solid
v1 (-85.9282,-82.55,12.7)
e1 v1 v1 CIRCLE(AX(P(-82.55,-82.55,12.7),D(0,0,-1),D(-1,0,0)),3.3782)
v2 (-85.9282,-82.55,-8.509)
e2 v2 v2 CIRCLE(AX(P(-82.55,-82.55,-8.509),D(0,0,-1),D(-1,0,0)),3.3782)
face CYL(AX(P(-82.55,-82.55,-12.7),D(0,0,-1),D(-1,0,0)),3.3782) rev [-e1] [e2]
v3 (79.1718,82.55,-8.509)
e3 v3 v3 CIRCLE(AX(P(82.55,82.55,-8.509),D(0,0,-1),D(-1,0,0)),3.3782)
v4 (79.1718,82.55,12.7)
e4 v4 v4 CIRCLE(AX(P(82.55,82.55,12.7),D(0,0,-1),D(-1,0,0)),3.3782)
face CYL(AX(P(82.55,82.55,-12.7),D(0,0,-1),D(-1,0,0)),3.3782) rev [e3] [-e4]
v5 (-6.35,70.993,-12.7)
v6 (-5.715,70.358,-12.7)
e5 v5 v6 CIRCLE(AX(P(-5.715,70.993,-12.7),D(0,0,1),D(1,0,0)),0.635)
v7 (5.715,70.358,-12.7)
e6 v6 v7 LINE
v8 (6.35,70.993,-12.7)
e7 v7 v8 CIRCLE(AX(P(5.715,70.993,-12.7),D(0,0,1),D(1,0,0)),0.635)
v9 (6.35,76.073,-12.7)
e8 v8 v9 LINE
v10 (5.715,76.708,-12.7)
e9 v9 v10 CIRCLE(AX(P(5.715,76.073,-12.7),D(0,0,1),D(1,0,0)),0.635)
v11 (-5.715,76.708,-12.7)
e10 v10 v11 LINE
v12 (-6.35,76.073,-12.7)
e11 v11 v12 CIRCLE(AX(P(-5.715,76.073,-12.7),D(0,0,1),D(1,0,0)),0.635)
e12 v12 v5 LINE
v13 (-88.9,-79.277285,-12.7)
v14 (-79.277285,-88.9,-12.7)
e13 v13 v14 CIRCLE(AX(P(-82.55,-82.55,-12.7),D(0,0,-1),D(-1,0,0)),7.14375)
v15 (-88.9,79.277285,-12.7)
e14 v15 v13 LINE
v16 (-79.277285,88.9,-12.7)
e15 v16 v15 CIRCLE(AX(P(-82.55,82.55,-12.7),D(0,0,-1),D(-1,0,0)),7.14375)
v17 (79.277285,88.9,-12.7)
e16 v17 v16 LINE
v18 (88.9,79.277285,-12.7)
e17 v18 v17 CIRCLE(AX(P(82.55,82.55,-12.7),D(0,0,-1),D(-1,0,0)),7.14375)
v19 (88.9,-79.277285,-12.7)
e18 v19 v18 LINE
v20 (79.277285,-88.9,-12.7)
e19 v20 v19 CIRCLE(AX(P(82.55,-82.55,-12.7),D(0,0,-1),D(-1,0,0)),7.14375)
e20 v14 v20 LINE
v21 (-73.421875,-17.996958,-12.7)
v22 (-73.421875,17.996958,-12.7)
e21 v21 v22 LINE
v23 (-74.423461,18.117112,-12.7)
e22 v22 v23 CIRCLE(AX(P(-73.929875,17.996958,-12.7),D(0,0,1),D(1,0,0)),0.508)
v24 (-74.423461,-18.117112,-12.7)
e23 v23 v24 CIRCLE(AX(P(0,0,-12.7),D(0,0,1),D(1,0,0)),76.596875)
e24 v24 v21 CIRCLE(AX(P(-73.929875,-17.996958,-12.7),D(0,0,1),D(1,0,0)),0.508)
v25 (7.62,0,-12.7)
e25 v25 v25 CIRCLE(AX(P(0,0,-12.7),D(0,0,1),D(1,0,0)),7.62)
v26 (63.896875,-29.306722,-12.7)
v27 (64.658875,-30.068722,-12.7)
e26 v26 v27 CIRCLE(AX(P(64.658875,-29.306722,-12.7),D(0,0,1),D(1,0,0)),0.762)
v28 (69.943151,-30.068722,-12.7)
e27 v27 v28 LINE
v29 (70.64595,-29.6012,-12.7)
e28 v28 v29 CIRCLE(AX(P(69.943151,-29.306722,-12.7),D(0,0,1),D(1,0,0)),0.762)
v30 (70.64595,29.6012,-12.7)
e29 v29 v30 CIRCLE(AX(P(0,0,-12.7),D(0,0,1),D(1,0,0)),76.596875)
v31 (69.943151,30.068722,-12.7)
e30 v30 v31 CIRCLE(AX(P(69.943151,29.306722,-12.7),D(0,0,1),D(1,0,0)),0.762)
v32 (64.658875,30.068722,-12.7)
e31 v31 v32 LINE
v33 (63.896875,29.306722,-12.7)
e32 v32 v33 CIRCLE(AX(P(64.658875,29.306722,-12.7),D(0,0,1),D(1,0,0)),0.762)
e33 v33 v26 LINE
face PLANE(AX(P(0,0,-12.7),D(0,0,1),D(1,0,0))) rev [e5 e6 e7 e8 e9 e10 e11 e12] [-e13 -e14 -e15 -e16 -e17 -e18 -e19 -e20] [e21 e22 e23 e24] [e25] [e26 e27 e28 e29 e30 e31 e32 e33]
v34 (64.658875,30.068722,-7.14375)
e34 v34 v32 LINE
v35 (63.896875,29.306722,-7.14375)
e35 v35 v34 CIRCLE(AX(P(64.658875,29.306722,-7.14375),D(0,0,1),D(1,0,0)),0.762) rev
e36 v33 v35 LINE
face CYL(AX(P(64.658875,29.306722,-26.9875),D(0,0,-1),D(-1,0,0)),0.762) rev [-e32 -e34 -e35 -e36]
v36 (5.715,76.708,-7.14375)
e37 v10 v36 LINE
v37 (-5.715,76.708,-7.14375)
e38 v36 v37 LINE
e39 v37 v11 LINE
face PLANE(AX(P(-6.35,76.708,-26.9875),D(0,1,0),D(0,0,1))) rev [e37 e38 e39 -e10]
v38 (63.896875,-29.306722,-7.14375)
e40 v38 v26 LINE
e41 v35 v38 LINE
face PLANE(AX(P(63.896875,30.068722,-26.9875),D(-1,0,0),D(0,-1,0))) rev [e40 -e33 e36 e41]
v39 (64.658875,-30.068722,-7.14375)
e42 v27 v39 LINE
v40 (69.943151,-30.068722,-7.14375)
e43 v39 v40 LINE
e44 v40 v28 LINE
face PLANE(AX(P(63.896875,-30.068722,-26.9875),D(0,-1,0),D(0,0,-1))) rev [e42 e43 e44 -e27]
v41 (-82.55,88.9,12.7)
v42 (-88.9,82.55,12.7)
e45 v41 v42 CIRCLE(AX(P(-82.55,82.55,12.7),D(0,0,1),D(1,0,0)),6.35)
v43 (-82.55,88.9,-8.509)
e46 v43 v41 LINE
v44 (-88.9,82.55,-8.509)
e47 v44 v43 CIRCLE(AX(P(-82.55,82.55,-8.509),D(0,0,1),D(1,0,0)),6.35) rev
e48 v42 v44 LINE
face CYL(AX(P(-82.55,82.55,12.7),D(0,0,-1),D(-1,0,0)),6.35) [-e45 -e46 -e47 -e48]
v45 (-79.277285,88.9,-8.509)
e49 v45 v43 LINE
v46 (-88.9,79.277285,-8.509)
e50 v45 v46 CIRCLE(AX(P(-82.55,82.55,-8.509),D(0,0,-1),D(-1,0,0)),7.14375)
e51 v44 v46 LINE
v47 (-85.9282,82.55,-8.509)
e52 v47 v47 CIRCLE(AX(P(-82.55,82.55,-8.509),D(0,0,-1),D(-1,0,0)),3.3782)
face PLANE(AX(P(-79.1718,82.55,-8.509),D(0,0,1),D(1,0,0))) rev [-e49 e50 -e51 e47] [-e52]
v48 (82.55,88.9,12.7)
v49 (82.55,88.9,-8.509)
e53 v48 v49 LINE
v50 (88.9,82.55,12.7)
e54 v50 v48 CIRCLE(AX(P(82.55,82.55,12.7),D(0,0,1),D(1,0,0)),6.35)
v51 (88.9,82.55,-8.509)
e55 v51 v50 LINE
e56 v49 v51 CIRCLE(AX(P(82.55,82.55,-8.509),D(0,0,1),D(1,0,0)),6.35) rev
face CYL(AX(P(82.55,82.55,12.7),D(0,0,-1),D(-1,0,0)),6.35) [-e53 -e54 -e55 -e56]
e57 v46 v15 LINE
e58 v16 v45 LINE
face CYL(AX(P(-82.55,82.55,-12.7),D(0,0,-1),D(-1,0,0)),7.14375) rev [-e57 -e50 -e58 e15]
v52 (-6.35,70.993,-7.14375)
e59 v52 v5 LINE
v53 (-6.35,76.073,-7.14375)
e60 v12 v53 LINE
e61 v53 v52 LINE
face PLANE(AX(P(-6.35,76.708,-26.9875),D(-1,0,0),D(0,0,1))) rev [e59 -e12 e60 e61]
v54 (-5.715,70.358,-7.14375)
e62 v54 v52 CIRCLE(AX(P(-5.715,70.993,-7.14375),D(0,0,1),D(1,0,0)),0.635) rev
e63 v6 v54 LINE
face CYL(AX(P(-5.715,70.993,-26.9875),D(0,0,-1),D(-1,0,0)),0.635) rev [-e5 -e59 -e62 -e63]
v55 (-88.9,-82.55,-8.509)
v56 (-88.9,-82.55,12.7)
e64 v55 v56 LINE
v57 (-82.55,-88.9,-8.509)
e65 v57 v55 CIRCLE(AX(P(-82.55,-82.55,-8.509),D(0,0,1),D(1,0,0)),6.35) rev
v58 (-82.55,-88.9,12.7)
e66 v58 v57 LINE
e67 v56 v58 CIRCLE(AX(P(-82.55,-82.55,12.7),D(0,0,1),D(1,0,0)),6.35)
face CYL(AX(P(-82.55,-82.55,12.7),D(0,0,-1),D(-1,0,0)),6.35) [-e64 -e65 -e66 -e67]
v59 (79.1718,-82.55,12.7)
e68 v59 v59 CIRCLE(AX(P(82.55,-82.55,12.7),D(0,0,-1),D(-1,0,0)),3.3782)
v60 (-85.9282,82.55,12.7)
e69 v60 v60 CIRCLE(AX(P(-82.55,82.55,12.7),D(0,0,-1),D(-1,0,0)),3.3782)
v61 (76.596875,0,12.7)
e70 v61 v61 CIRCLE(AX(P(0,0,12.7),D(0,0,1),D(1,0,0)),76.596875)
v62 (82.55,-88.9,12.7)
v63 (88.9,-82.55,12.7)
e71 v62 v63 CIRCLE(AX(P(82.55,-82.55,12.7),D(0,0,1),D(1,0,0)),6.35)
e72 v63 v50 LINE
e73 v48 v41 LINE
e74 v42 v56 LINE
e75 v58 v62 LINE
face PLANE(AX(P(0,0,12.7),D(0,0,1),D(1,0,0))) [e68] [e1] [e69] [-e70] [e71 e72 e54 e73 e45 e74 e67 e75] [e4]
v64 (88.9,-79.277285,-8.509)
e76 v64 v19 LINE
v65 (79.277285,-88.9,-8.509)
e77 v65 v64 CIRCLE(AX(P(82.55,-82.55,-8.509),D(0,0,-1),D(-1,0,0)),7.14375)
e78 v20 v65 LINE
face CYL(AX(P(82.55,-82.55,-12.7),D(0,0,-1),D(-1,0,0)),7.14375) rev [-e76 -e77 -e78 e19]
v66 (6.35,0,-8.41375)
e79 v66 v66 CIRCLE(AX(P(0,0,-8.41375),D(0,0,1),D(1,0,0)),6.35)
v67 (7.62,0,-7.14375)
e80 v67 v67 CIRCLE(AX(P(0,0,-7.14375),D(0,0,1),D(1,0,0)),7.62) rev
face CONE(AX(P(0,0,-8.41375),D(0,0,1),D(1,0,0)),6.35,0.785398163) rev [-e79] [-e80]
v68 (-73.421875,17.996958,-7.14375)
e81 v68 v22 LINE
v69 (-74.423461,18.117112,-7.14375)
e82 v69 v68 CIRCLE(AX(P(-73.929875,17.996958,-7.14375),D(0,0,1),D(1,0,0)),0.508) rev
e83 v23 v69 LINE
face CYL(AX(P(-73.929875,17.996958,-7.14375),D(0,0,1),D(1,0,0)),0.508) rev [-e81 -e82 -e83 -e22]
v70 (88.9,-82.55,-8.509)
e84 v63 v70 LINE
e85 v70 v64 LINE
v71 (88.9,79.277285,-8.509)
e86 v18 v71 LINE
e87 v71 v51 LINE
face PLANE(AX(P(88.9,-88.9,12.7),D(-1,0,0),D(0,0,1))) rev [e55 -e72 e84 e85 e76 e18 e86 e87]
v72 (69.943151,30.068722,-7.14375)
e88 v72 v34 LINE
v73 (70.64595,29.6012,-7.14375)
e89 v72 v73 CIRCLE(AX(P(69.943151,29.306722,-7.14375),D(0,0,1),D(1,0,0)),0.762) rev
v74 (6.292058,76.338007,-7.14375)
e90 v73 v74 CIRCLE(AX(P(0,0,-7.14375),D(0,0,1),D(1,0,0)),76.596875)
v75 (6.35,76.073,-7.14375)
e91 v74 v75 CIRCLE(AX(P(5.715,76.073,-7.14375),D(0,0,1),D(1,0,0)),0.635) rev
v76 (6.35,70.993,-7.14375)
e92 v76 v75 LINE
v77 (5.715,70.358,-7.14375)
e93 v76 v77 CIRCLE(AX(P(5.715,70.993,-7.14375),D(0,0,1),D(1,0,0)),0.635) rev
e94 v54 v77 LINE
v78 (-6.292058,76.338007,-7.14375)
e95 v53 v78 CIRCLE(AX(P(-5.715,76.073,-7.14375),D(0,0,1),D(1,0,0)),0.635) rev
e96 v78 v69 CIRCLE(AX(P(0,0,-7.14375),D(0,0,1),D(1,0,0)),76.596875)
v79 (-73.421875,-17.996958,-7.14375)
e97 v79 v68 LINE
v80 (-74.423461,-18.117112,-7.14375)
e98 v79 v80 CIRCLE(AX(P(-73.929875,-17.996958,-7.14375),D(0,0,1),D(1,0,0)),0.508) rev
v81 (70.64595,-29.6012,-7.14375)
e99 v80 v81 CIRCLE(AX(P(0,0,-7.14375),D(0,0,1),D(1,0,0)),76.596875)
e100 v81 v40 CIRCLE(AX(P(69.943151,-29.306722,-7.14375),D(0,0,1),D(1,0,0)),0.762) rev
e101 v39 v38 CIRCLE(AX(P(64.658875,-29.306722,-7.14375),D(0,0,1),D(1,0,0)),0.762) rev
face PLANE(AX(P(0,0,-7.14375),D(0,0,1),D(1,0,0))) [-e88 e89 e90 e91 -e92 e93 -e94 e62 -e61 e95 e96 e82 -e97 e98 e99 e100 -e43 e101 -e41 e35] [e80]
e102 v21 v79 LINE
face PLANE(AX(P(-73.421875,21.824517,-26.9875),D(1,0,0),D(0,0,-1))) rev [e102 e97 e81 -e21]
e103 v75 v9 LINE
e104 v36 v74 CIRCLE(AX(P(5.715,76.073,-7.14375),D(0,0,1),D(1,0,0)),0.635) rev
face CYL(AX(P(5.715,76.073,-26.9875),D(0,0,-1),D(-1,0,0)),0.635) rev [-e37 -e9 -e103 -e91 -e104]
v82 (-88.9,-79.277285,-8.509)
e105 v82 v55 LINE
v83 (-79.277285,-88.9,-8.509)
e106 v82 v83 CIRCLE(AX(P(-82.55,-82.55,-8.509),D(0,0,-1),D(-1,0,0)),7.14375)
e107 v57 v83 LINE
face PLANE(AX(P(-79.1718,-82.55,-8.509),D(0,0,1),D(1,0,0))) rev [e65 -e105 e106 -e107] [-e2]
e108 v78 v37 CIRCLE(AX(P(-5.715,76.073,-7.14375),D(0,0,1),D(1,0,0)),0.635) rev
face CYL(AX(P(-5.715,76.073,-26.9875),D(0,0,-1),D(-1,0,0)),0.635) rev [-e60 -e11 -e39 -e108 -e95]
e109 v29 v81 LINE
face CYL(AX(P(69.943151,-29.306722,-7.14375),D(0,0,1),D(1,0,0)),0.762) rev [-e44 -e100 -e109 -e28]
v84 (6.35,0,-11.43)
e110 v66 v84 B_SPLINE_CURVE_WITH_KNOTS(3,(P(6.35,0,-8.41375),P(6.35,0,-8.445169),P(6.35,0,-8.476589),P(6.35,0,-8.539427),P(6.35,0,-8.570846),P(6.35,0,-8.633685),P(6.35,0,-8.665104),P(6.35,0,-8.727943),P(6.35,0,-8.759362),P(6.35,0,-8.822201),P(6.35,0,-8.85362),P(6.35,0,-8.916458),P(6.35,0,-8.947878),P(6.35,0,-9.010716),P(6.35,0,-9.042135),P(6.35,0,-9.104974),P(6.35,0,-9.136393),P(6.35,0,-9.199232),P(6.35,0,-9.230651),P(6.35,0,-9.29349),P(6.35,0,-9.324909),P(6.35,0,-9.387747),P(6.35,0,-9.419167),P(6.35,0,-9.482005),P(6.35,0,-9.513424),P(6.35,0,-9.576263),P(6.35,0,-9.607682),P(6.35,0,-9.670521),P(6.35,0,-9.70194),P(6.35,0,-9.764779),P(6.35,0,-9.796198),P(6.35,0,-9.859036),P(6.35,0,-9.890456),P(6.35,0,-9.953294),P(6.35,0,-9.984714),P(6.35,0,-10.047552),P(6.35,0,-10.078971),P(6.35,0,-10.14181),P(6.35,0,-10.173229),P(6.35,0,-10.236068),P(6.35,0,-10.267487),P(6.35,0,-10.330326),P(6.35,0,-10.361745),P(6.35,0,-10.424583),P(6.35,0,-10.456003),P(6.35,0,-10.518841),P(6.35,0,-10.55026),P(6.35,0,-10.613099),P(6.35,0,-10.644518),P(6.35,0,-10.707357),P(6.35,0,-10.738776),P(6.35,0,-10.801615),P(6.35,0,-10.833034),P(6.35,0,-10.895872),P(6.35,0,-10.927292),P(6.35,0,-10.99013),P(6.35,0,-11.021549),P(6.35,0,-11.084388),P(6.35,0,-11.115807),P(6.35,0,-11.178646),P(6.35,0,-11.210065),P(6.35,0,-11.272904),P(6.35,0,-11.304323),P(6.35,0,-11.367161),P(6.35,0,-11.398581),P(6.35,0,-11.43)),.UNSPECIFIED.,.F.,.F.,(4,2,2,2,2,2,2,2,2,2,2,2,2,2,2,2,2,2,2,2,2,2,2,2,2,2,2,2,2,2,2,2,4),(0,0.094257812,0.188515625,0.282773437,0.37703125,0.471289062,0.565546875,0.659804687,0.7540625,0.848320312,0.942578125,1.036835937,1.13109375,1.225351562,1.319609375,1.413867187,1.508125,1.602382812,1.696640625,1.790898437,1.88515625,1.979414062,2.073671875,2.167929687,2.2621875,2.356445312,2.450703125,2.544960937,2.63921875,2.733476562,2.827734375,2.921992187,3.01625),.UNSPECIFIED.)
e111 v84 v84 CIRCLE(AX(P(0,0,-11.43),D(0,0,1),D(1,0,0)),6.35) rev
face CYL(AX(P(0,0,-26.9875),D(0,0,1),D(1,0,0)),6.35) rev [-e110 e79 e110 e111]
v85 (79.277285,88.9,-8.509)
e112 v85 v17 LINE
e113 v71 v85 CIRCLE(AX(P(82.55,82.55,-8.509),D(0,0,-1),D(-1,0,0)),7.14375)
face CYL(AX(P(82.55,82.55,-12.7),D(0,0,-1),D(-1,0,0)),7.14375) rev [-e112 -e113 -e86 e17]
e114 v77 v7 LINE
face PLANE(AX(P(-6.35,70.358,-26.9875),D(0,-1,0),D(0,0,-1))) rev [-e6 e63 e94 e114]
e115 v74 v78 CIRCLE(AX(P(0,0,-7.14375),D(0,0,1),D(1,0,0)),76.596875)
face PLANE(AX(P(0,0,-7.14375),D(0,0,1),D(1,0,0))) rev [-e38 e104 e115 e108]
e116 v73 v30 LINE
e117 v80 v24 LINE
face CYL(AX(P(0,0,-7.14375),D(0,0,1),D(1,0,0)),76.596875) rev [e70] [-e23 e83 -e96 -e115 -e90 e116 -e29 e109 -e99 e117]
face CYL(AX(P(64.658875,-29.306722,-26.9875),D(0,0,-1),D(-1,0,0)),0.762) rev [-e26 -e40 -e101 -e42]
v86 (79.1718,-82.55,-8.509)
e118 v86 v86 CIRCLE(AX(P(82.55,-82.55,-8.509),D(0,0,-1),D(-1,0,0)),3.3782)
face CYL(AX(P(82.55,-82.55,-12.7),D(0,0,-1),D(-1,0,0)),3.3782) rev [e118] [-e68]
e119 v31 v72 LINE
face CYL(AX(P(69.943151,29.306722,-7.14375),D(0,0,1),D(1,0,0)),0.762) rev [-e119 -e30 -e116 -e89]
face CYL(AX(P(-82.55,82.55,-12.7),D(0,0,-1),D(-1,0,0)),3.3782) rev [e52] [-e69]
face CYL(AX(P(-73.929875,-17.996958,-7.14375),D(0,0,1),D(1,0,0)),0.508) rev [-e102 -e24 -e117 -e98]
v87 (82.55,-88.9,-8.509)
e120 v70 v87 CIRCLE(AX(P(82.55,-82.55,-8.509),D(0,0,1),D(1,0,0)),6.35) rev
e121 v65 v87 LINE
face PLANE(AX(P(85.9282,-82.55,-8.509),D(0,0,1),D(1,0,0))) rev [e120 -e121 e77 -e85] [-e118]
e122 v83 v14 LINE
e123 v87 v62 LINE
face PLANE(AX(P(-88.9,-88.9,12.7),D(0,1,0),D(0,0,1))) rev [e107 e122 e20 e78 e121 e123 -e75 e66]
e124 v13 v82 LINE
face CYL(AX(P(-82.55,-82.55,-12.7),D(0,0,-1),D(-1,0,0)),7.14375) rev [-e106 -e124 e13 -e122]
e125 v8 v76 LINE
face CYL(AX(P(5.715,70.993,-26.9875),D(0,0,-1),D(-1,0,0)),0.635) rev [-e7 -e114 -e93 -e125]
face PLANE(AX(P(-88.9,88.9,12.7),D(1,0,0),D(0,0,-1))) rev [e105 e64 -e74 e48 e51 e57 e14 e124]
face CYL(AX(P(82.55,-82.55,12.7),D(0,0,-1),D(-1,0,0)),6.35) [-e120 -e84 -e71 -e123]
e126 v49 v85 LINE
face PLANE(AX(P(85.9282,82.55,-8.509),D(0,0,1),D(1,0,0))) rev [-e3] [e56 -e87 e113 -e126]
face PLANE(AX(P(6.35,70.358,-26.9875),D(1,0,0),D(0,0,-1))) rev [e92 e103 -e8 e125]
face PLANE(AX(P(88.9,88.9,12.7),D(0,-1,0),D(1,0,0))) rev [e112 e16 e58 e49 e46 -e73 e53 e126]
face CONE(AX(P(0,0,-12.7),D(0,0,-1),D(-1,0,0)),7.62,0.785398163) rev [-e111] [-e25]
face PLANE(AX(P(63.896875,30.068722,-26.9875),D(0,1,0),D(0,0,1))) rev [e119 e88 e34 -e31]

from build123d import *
from build123d.topology import SkipClean

# Parameters (mm, degrees)
SKETCH1_W                                            = 177.8
SKETCH1_H                                            = 177.8
BOSS_EXTRUDE1_DEPTH                                  = 12.7
SKETCH2_R                                            = 76.596875
CUT_EXTRUDE1_DEPTH                                   = 19.84375
SKETCH3_R                                            = 6.35
CUT_EXTRUDE2_DEPTH                                   = 19.84375
SKETCH5_W                                            = 12.7
SKETCH5_H                                            = 6.35
CUT_EXTRUDE3_DEPTH                                   = 19.84375
FILLET1_R                                            = 6.35
FILLET2_R                                            = 0.635
FILLET3_R                                            = 0.508
CHAMFER2_SIZE                                        = 1.27
FILLET5_R                                            = 0.762
CBORE_FOR_1_4_BINDING_HEAD_MACHINE_SCREW_D           = 6.7564
CBORE_FOR_1_4_BINDING_HEAD_MACHINE_SCREW_CBORE_D     = 14.2875
CBORE_FOR_1_4_BINDING_HEAD_MACHINE_SCREW_CBORE_DEPTH = 4.191


with BuildPart() as part:
    # Sketch1 → Boss-Extrude1 (new, symmetric)
    with BuildSketch(Plane.XY):
        Rectangle(SKETCH1_W, SKETCH1_H)
    extrude(amount=BOSS_EXTRUDE1_DEPTH, both=True)

    # Sketch2 → Cut-Extrude1 (cut)
    with BuildSketch(Plane.XY.offset(12.7)):
        Circle(SKETCH2_R)
    extrude(amount=-CUT_EXTRUDE1_DEPTH, mode=Mode.SUBTRACT)

    # Sketch3 → Cut-Extrude2 (cut)
    with BuildSketch(Plane.XY.offset(-7.14375)):
        Circle(SKETCH3_R)
    extrude(amount=-CUT_EXTRUDE2_DEPTH, mode=Mode.SUBTRACT)

    # Sketch5 → Cut-Extrude3 (cut)
    with SkipClean():  # the faces are left unmerged after this step: merging them gives an invalid solid
        with BuildSketch(Plane.XY.offset(-7.14375)):
            with BuildLine():
                Line((-73.421875, 21.824516747), (-73.421875, -21.824516747))
                ThreePointArc((-73.421875, -21.824516747), (-76.596875, 0), (-73.421875, 21.824516747))
            make_face()
            with Locations((0, 73.533)):
                Rectangle(SKETCH5_W, SKETCH5_H)
            with BuildLine():
                Line((63.896875, 30.068721747), (63.896875, -30.068721747))
                Line((63.896875, -30.068721747), (70.448230867, -30.068721747))
                ThreePointArc((70.448230867, -30.068721747), (76.596875, 0), (70.448230867, 30.068721747))
                Line((70.448230867, 30.068721747), (63.896875, 30.068721747))
            make_face()
        extrude(amount=-CUT_EXTRUDE3_DEPTH, mode=Mode.SUBTRACT)

    # Fillet1
    fillet1_edges = [part.edges().sort_by_distance(p)[0] for p in [
        (88.9, 88.9, 0),
        (88.9, -88.9, 0),
        (-88.9, -88.9, 0),
        (-88.9, 88.9, 0),
    ]]
    fillet(fillet1_edges, radius=FILLET1_R)

    # Fillet2
    # the kernel refuses this fillet: 0.635 mm, written as the material it adds along each edge
    with BuildSketch(Plane(origin=(-6.35, 76.708, -7.14375), x_dir=(0, -1, 0), z_dir=(0, 0, -1))) as fillet2_piece_1:
        with BuildLine():
            CenterArc((FILLET2_R, -FILLET2_R), FILLET2_R, 90, 90)
            Line((0, -FILLET2_R), (0, 0))
            Line((0, 0), (FILLET2_R, 0))
        make_face()
    extrude(amount=5.55625)
    with BuildSketch(Plane(origin=(-6.35, 70.358, -7.14375), x_dir=(0, 1, 0), z_dir=(0, 0, -1)), Plane(origin=(6.35, 76.708, -7.14375), x_dir=(0, -1, 0), z_dir=(0, 0, -1)), Plane(origin=(6.35, 70.358, -7.14375), x_dir=(-1, 0, 0), z_dir=(0, 0, -1))) as fillet2_piece_2:
        with BuildLine():
            CenterArc((FILLET2_R, FILLET2_R), FILLET2_R, 180, 90)
            Line((0, FILLET2_R), (0, 0))
            Line((0, 0), (FILLET2_R, 0))
        make_face()
    extrude(amount=5.55625)

    # Fillet3
    # the kernel refuses this fillet: 0.508 mm, written as the material it adds along each edge
    with BuildSketch(Plane(origin=(-73.421875, -21.824516747, -7.14375), x_dir=(0, 1, 0), z_dir=(0, 0, -1))) as fillet3_piece_1:
        with BuildLine():
            CenterArc((3.827559192, -0.508), FILLET3_R, 90, 166.318438428)
            ThreePointArc((3.707404249, -1.001585646), (1.847424112, -0.524031105), (0, 0))
            Line((0, 0), (3.827559192, 0))
        make_face()
    extrude(amount=5.55625)
    with BuildSketch(Plane(origin=(-73.421875, 21.824516747, -7.14375), x_dir=(0, -1, 0), z_dir=(0, 0, -1))) as fillet3_piece_2:
        with BuildLine():
            CenterArc((3.827559192, 0.508), FILLET3_R, 103.681561572, 166.318438428)
            ThreePointArc((3.707404249, 1.001585646), (1.847424112, 0.524031105), (0, 0))
            Line((0, 0), (3.827559192, 0))
        make_face()
    extrude(amount=5.55625)

    # Chamfer2
    chamfer2_edges = [part.edges().sort_by_distance(p)[0] for p in [
        (-6.35, 0, -12.7),
        (-6.35, 0, -7.14375),
    ]]
    chamfer(chamfer2_edges, length=CHAMFER2_SIZE)

    # Fillet5
    # the kernel refuses this fillet: 0.762 mm, written as the material it adds along each edge
    with BuildSketch(Plane(origin=(70.448230867, -30.068721747, -7.14375), x_dir=(-1, 0, 0), z_dir=(0, 0, -1))) as fillet5_piece_1:
        with BuildLine():
            CenterArc((0.505080189, 0.762), FILLET5_R, 202.734061429, 67.265938571)
            ThreePointArc((-0.197718896, 0.467521741), (-0.099246736, 0.233597083), (0, 0))
            Line((0, 0), (0.505080189, 0))
        make_face()
    extrude(amount=5.55625)
    with BuildSketch(Plane(origin=(63.896875, -30.068721747, -7.14375), x_dir=(1, 0, 0), z_dir=(0, 0, -1)), Plane(origin=(63.896875, 30.068721747, -7.14375), x_dir=(0, -1, 0), z_dir=(0, 0, -1))) as fillet5_piece_2:
        with BuildLine():
            CenterArc((FILLET5_R, -FILLET5_R), FILLET5_R, 90, 90)
            Line((0, -FILLET5_R), (0, 0))
            Line((0, 0), (FILLET5_R, 0))
        make_face()
    extrude(amount=5.55625)
    with BuildSketch(Plane(origin=(70.448230867, 30.068721747, -7.14375), x_dir=(-1, 0, 0), z_dir=(0, 0, -1))) as fillet5_piece_3:
        with BuildLine():
            CenterArc((0.505080189, -0.762), FILLET5_R, 90, 67.265938571)
            ThreePointArc((-0.197718896, -0.467521741), (-0.099246736, -0.233597083), (0, 0))
            Line((0, 0), (0.505080189, 0))
        make_face()
    extrude(amount=5.55625)

    # CBORE for 1/4 Binding Head Machine Screw1 (through all)
    with Locations(Plane(origin=(0, 0, -12.7), x_dir=(-1, 0, 0), z_dir=(0, 0, -1))):
        with Locations((-82.55, 82.55), (82.55, 82.55), (82.55, -82.55), (-82.55, -82.55)):
            CounterBoreHole(CBORE_FOR_1_4_BINDING_HEAD_MACHINE_SCREW_D / 2, CBORE_FOR_1_4_BINDING_HEAD_MACHINE_SCREW_CBORE_D / 2, CBORE_FOR_1_4_BINDING_HEAD_MACHINE_SCREW_CBORE_DEPTH)


solid = part.part
